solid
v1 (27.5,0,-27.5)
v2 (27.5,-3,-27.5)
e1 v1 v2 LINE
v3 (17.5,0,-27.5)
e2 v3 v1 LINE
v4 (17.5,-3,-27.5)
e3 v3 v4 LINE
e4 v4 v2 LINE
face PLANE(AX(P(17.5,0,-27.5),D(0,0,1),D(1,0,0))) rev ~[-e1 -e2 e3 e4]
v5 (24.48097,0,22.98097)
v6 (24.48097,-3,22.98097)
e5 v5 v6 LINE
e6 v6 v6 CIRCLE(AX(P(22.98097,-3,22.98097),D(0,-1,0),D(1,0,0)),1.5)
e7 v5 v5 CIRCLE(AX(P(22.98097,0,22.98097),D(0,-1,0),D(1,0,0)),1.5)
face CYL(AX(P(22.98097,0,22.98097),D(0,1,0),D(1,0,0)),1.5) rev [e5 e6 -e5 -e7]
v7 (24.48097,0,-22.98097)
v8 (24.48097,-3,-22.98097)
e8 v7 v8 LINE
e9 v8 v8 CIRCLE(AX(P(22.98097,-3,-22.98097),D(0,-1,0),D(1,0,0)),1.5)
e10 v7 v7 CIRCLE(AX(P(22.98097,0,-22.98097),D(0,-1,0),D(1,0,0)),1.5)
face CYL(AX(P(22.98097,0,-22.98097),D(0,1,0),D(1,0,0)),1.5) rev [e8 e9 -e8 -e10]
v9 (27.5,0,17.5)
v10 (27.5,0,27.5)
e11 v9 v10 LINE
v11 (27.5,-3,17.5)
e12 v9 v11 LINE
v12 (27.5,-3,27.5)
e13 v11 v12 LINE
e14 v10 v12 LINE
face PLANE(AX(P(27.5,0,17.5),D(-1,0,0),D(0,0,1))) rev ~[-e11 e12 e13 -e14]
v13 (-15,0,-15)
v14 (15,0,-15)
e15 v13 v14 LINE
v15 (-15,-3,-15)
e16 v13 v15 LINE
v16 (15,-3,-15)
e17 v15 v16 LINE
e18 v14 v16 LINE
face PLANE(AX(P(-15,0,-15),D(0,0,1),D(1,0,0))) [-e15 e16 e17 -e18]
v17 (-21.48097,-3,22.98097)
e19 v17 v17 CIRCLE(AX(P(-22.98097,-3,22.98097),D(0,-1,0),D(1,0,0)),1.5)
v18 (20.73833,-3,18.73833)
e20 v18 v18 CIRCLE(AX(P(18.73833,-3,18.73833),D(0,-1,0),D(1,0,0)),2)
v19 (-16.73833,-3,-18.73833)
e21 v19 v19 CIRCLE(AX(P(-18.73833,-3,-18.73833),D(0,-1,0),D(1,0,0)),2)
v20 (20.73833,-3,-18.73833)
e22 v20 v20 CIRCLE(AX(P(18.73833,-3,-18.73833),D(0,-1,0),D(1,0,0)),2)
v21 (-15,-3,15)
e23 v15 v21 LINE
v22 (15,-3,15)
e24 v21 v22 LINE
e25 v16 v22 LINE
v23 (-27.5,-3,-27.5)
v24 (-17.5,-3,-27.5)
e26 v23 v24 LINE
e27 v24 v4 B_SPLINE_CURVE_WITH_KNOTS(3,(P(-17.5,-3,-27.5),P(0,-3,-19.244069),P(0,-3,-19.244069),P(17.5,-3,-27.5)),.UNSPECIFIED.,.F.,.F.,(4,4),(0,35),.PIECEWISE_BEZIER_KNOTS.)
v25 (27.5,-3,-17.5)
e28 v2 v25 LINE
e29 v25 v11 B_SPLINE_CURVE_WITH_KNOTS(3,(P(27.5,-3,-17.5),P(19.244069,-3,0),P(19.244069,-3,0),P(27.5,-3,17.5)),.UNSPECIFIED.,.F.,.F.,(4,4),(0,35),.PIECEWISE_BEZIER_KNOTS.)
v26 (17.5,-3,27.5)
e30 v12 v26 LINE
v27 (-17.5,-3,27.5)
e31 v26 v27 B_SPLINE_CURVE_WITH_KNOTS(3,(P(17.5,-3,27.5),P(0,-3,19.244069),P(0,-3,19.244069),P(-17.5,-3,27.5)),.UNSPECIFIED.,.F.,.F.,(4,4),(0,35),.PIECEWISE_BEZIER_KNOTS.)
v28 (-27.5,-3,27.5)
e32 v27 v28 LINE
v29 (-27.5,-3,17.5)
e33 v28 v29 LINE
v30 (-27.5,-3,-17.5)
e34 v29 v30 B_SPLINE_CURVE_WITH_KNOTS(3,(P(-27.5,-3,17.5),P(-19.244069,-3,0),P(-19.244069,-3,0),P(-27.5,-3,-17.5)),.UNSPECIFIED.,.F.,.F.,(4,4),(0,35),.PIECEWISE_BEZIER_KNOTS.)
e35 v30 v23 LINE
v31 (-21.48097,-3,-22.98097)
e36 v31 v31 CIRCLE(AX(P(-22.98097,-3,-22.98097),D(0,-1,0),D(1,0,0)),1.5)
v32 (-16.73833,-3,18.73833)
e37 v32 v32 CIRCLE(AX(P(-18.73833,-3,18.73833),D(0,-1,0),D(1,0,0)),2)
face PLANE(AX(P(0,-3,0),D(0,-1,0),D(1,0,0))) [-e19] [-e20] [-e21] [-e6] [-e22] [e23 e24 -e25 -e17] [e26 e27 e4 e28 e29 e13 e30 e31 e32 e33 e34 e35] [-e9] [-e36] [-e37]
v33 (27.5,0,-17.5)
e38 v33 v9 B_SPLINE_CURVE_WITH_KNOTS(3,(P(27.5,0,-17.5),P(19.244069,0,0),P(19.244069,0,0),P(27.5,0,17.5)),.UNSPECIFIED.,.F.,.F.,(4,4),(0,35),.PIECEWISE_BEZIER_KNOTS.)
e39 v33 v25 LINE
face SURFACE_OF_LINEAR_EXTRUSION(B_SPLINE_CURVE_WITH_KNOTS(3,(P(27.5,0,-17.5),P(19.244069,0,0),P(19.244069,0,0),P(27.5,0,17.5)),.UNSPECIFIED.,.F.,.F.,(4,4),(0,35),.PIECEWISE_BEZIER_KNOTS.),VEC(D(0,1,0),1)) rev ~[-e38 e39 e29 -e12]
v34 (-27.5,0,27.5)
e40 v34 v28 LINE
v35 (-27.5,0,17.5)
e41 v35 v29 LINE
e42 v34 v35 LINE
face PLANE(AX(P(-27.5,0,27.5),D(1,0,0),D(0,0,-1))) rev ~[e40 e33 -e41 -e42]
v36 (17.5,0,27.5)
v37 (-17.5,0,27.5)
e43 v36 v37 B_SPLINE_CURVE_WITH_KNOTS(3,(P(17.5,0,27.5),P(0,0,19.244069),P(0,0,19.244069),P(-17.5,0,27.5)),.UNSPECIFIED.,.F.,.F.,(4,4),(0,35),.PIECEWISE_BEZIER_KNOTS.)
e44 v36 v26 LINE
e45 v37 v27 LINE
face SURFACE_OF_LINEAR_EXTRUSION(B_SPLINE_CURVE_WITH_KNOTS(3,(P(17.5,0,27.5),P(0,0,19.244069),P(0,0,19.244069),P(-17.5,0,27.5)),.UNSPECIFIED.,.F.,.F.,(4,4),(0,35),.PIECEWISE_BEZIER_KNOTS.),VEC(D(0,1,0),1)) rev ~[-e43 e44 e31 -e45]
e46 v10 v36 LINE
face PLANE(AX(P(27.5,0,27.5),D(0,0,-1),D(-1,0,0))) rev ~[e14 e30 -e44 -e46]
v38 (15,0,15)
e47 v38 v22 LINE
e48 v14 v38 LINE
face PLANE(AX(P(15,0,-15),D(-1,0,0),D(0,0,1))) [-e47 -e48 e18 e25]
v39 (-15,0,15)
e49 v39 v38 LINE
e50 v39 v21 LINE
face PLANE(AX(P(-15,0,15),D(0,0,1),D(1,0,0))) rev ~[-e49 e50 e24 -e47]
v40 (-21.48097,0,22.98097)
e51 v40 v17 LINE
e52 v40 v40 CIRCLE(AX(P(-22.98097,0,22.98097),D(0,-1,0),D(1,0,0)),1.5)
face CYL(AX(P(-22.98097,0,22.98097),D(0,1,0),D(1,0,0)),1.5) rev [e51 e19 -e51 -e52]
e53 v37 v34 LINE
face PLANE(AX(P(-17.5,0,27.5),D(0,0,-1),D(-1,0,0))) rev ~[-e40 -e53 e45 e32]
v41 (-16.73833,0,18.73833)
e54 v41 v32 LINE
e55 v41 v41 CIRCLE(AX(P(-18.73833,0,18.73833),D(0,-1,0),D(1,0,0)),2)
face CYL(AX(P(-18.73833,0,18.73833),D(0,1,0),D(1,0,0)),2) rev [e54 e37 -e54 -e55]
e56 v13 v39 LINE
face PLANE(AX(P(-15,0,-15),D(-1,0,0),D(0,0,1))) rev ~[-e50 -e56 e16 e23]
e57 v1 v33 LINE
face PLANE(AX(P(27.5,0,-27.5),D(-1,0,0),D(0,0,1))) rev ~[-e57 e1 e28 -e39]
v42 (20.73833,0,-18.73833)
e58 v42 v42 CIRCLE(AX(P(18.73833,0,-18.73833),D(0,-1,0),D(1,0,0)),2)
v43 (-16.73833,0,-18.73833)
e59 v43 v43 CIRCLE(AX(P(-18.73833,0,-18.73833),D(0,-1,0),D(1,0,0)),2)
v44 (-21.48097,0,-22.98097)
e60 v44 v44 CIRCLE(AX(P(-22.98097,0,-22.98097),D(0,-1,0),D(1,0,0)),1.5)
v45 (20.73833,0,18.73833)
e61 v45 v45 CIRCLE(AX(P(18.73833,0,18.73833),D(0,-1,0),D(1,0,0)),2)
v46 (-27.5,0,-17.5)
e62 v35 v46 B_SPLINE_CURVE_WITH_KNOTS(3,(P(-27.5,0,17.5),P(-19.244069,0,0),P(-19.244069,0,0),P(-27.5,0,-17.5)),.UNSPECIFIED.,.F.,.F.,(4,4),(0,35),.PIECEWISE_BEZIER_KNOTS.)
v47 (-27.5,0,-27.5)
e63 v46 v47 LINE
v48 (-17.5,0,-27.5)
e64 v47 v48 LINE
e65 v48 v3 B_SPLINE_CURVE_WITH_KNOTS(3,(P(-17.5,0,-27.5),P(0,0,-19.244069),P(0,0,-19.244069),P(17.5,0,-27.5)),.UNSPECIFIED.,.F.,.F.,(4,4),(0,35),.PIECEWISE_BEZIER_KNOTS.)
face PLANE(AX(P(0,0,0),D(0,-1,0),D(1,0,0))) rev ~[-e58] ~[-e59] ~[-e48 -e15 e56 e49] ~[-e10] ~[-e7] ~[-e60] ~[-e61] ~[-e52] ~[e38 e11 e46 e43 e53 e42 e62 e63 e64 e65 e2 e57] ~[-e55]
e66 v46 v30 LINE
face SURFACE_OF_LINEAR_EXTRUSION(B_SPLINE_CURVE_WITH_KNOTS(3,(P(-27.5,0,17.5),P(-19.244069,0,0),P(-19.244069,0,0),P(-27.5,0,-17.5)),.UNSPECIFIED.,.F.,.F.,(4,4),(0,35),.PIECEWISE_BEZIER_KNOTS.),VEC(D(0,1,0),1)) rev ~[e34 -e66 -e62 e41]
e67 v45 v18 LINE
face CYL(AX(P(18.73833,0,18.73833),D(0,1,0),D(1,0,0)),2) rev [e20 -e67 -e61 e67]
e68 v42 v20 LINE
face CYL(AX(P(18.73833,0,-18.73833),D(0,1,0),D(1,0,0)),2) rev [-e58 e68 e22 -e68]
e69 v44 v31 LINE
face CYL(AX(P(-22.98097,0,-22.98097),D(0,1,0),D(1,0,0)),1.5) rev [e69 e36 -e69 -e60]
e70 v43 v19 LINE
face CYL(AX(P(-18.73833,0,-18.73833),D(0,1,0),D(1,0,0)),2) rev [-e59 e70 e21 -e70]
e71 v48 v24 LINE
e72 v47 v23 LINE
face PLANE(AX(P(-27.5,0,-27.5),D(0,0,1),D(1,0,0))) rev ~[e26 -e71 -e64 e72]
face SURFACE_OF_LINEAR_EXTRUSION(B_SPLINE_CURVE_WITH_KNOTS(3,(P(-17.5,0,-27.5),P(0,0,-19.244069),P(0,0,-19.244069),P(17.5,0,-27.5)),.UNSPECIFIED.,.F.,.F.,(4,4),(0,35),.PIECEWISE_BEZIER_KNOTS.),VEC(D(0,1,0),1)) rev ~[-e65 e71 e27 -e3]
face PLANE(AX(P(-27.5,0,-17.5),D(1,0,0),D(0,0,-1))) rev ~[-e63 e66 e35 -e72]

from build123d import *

# Parameters (mm, degrees)
F0_R     = 1.5
F0_R_2   = 2
F0_W     = 30
F0_H     = 30
F1_DEPTH = 3


# Not quite as in the source:
# - ends of sketch curves that miss each other by under 0.0002 mm in the source are joined


with BuildPart() as f1:
    # F0 (on Front) → F1 (new body)
    with BuildSketch(Plane.XZ):
        with BuildLine():
            Line((27.5, 17.5), (27.5, 27.5))
            Line((27.5, 27.5), (17.5, 27.5))
            add(Edge.make_bspline(
                [(17.5, 27.5), (0, 19.2440692335), (0, 19.2440692335), (-17.5, 27.5)],
                knots=[0, 0, 0, 0, 35, 35, 35, 35], degree=3))
            Line((-17.5, 27.5), (-27.5, 27.5))
            Line((-27.5, 27.5), (-27.5, 17.5))
            add(Edge.make_bspline(
                [(-27.5, 17.5), (-19.2440692335, 0), (-19.2440692335, 0), (-27.5, -17.5)],
                knots=[0, 0, 0, 0, 35, 35, 35, 35], degree=3))
            Line((-27.5, -17.5), (-27.5, -27.5))
            Line((-27.5, -27.5), (-17.5, -27.5))
            add(Edge.make_bspline(
                [(-17.5, -27.5), (0, -19.2440692335), (0, -19.2440692335), (17.5, -27.5)],
                knots=[0, 0, 0, 0, 35, 35, 35, 35], degree=3))
            Line((17.5, -27.5), (27.5, -27.5))
            Line((27.5, -27.5), (27.5, -17.5))
            add(Edge.make_bspline(
                [(27.5, -17.5), (19.2440690845, 0), (19.2440692335, 0), (27.5, 17.5)],
                knots=[0, 0, 0, 0, 35, 35, 35, 35], degree=3))
        make_face()
        with Locations((-22.9809703886, -22.9809703886)):
            Circle(F0_R, mode=Mode.SUBTRACT)
        with Locations((-18.7383297014, -18.7383297014)):
            Circle(F0_R_2, mode=Mode.SUBTRACT)
        with Locations((22.9809703886, -22.9809703886)):
            Circle(F0_R, mode=Mode.SUBTRACT)
        with Locations((18.7383297014, -18.7383297014)):
            Circle(F0_R_2, mode=Mode.SUBTRACT)
        with Locations((-18.7383297014, 18.7383297014)):
            Circle(F0_R_2, mode=Mode.SUBTRACT)
        with Locations((-22.9809703886, 22.9809703886)):
            Circle(F0_R, mode=Mode.SUBTRACT)
        Rectangle(F0_W, F0_H, mode=Mode.SUBTRACT)
        with Locations((18.7383297014, 18.7383297014)):
            Circle(F0_R_2, mode=Mode.SUBTRACT)
        with Locations((22.9809703886, 22.9809703886)):
            Circle(F0_R, mode=Mode.SUBTRACT)
    extrude(amount=F1_DEPTH)


solid = f1.part
